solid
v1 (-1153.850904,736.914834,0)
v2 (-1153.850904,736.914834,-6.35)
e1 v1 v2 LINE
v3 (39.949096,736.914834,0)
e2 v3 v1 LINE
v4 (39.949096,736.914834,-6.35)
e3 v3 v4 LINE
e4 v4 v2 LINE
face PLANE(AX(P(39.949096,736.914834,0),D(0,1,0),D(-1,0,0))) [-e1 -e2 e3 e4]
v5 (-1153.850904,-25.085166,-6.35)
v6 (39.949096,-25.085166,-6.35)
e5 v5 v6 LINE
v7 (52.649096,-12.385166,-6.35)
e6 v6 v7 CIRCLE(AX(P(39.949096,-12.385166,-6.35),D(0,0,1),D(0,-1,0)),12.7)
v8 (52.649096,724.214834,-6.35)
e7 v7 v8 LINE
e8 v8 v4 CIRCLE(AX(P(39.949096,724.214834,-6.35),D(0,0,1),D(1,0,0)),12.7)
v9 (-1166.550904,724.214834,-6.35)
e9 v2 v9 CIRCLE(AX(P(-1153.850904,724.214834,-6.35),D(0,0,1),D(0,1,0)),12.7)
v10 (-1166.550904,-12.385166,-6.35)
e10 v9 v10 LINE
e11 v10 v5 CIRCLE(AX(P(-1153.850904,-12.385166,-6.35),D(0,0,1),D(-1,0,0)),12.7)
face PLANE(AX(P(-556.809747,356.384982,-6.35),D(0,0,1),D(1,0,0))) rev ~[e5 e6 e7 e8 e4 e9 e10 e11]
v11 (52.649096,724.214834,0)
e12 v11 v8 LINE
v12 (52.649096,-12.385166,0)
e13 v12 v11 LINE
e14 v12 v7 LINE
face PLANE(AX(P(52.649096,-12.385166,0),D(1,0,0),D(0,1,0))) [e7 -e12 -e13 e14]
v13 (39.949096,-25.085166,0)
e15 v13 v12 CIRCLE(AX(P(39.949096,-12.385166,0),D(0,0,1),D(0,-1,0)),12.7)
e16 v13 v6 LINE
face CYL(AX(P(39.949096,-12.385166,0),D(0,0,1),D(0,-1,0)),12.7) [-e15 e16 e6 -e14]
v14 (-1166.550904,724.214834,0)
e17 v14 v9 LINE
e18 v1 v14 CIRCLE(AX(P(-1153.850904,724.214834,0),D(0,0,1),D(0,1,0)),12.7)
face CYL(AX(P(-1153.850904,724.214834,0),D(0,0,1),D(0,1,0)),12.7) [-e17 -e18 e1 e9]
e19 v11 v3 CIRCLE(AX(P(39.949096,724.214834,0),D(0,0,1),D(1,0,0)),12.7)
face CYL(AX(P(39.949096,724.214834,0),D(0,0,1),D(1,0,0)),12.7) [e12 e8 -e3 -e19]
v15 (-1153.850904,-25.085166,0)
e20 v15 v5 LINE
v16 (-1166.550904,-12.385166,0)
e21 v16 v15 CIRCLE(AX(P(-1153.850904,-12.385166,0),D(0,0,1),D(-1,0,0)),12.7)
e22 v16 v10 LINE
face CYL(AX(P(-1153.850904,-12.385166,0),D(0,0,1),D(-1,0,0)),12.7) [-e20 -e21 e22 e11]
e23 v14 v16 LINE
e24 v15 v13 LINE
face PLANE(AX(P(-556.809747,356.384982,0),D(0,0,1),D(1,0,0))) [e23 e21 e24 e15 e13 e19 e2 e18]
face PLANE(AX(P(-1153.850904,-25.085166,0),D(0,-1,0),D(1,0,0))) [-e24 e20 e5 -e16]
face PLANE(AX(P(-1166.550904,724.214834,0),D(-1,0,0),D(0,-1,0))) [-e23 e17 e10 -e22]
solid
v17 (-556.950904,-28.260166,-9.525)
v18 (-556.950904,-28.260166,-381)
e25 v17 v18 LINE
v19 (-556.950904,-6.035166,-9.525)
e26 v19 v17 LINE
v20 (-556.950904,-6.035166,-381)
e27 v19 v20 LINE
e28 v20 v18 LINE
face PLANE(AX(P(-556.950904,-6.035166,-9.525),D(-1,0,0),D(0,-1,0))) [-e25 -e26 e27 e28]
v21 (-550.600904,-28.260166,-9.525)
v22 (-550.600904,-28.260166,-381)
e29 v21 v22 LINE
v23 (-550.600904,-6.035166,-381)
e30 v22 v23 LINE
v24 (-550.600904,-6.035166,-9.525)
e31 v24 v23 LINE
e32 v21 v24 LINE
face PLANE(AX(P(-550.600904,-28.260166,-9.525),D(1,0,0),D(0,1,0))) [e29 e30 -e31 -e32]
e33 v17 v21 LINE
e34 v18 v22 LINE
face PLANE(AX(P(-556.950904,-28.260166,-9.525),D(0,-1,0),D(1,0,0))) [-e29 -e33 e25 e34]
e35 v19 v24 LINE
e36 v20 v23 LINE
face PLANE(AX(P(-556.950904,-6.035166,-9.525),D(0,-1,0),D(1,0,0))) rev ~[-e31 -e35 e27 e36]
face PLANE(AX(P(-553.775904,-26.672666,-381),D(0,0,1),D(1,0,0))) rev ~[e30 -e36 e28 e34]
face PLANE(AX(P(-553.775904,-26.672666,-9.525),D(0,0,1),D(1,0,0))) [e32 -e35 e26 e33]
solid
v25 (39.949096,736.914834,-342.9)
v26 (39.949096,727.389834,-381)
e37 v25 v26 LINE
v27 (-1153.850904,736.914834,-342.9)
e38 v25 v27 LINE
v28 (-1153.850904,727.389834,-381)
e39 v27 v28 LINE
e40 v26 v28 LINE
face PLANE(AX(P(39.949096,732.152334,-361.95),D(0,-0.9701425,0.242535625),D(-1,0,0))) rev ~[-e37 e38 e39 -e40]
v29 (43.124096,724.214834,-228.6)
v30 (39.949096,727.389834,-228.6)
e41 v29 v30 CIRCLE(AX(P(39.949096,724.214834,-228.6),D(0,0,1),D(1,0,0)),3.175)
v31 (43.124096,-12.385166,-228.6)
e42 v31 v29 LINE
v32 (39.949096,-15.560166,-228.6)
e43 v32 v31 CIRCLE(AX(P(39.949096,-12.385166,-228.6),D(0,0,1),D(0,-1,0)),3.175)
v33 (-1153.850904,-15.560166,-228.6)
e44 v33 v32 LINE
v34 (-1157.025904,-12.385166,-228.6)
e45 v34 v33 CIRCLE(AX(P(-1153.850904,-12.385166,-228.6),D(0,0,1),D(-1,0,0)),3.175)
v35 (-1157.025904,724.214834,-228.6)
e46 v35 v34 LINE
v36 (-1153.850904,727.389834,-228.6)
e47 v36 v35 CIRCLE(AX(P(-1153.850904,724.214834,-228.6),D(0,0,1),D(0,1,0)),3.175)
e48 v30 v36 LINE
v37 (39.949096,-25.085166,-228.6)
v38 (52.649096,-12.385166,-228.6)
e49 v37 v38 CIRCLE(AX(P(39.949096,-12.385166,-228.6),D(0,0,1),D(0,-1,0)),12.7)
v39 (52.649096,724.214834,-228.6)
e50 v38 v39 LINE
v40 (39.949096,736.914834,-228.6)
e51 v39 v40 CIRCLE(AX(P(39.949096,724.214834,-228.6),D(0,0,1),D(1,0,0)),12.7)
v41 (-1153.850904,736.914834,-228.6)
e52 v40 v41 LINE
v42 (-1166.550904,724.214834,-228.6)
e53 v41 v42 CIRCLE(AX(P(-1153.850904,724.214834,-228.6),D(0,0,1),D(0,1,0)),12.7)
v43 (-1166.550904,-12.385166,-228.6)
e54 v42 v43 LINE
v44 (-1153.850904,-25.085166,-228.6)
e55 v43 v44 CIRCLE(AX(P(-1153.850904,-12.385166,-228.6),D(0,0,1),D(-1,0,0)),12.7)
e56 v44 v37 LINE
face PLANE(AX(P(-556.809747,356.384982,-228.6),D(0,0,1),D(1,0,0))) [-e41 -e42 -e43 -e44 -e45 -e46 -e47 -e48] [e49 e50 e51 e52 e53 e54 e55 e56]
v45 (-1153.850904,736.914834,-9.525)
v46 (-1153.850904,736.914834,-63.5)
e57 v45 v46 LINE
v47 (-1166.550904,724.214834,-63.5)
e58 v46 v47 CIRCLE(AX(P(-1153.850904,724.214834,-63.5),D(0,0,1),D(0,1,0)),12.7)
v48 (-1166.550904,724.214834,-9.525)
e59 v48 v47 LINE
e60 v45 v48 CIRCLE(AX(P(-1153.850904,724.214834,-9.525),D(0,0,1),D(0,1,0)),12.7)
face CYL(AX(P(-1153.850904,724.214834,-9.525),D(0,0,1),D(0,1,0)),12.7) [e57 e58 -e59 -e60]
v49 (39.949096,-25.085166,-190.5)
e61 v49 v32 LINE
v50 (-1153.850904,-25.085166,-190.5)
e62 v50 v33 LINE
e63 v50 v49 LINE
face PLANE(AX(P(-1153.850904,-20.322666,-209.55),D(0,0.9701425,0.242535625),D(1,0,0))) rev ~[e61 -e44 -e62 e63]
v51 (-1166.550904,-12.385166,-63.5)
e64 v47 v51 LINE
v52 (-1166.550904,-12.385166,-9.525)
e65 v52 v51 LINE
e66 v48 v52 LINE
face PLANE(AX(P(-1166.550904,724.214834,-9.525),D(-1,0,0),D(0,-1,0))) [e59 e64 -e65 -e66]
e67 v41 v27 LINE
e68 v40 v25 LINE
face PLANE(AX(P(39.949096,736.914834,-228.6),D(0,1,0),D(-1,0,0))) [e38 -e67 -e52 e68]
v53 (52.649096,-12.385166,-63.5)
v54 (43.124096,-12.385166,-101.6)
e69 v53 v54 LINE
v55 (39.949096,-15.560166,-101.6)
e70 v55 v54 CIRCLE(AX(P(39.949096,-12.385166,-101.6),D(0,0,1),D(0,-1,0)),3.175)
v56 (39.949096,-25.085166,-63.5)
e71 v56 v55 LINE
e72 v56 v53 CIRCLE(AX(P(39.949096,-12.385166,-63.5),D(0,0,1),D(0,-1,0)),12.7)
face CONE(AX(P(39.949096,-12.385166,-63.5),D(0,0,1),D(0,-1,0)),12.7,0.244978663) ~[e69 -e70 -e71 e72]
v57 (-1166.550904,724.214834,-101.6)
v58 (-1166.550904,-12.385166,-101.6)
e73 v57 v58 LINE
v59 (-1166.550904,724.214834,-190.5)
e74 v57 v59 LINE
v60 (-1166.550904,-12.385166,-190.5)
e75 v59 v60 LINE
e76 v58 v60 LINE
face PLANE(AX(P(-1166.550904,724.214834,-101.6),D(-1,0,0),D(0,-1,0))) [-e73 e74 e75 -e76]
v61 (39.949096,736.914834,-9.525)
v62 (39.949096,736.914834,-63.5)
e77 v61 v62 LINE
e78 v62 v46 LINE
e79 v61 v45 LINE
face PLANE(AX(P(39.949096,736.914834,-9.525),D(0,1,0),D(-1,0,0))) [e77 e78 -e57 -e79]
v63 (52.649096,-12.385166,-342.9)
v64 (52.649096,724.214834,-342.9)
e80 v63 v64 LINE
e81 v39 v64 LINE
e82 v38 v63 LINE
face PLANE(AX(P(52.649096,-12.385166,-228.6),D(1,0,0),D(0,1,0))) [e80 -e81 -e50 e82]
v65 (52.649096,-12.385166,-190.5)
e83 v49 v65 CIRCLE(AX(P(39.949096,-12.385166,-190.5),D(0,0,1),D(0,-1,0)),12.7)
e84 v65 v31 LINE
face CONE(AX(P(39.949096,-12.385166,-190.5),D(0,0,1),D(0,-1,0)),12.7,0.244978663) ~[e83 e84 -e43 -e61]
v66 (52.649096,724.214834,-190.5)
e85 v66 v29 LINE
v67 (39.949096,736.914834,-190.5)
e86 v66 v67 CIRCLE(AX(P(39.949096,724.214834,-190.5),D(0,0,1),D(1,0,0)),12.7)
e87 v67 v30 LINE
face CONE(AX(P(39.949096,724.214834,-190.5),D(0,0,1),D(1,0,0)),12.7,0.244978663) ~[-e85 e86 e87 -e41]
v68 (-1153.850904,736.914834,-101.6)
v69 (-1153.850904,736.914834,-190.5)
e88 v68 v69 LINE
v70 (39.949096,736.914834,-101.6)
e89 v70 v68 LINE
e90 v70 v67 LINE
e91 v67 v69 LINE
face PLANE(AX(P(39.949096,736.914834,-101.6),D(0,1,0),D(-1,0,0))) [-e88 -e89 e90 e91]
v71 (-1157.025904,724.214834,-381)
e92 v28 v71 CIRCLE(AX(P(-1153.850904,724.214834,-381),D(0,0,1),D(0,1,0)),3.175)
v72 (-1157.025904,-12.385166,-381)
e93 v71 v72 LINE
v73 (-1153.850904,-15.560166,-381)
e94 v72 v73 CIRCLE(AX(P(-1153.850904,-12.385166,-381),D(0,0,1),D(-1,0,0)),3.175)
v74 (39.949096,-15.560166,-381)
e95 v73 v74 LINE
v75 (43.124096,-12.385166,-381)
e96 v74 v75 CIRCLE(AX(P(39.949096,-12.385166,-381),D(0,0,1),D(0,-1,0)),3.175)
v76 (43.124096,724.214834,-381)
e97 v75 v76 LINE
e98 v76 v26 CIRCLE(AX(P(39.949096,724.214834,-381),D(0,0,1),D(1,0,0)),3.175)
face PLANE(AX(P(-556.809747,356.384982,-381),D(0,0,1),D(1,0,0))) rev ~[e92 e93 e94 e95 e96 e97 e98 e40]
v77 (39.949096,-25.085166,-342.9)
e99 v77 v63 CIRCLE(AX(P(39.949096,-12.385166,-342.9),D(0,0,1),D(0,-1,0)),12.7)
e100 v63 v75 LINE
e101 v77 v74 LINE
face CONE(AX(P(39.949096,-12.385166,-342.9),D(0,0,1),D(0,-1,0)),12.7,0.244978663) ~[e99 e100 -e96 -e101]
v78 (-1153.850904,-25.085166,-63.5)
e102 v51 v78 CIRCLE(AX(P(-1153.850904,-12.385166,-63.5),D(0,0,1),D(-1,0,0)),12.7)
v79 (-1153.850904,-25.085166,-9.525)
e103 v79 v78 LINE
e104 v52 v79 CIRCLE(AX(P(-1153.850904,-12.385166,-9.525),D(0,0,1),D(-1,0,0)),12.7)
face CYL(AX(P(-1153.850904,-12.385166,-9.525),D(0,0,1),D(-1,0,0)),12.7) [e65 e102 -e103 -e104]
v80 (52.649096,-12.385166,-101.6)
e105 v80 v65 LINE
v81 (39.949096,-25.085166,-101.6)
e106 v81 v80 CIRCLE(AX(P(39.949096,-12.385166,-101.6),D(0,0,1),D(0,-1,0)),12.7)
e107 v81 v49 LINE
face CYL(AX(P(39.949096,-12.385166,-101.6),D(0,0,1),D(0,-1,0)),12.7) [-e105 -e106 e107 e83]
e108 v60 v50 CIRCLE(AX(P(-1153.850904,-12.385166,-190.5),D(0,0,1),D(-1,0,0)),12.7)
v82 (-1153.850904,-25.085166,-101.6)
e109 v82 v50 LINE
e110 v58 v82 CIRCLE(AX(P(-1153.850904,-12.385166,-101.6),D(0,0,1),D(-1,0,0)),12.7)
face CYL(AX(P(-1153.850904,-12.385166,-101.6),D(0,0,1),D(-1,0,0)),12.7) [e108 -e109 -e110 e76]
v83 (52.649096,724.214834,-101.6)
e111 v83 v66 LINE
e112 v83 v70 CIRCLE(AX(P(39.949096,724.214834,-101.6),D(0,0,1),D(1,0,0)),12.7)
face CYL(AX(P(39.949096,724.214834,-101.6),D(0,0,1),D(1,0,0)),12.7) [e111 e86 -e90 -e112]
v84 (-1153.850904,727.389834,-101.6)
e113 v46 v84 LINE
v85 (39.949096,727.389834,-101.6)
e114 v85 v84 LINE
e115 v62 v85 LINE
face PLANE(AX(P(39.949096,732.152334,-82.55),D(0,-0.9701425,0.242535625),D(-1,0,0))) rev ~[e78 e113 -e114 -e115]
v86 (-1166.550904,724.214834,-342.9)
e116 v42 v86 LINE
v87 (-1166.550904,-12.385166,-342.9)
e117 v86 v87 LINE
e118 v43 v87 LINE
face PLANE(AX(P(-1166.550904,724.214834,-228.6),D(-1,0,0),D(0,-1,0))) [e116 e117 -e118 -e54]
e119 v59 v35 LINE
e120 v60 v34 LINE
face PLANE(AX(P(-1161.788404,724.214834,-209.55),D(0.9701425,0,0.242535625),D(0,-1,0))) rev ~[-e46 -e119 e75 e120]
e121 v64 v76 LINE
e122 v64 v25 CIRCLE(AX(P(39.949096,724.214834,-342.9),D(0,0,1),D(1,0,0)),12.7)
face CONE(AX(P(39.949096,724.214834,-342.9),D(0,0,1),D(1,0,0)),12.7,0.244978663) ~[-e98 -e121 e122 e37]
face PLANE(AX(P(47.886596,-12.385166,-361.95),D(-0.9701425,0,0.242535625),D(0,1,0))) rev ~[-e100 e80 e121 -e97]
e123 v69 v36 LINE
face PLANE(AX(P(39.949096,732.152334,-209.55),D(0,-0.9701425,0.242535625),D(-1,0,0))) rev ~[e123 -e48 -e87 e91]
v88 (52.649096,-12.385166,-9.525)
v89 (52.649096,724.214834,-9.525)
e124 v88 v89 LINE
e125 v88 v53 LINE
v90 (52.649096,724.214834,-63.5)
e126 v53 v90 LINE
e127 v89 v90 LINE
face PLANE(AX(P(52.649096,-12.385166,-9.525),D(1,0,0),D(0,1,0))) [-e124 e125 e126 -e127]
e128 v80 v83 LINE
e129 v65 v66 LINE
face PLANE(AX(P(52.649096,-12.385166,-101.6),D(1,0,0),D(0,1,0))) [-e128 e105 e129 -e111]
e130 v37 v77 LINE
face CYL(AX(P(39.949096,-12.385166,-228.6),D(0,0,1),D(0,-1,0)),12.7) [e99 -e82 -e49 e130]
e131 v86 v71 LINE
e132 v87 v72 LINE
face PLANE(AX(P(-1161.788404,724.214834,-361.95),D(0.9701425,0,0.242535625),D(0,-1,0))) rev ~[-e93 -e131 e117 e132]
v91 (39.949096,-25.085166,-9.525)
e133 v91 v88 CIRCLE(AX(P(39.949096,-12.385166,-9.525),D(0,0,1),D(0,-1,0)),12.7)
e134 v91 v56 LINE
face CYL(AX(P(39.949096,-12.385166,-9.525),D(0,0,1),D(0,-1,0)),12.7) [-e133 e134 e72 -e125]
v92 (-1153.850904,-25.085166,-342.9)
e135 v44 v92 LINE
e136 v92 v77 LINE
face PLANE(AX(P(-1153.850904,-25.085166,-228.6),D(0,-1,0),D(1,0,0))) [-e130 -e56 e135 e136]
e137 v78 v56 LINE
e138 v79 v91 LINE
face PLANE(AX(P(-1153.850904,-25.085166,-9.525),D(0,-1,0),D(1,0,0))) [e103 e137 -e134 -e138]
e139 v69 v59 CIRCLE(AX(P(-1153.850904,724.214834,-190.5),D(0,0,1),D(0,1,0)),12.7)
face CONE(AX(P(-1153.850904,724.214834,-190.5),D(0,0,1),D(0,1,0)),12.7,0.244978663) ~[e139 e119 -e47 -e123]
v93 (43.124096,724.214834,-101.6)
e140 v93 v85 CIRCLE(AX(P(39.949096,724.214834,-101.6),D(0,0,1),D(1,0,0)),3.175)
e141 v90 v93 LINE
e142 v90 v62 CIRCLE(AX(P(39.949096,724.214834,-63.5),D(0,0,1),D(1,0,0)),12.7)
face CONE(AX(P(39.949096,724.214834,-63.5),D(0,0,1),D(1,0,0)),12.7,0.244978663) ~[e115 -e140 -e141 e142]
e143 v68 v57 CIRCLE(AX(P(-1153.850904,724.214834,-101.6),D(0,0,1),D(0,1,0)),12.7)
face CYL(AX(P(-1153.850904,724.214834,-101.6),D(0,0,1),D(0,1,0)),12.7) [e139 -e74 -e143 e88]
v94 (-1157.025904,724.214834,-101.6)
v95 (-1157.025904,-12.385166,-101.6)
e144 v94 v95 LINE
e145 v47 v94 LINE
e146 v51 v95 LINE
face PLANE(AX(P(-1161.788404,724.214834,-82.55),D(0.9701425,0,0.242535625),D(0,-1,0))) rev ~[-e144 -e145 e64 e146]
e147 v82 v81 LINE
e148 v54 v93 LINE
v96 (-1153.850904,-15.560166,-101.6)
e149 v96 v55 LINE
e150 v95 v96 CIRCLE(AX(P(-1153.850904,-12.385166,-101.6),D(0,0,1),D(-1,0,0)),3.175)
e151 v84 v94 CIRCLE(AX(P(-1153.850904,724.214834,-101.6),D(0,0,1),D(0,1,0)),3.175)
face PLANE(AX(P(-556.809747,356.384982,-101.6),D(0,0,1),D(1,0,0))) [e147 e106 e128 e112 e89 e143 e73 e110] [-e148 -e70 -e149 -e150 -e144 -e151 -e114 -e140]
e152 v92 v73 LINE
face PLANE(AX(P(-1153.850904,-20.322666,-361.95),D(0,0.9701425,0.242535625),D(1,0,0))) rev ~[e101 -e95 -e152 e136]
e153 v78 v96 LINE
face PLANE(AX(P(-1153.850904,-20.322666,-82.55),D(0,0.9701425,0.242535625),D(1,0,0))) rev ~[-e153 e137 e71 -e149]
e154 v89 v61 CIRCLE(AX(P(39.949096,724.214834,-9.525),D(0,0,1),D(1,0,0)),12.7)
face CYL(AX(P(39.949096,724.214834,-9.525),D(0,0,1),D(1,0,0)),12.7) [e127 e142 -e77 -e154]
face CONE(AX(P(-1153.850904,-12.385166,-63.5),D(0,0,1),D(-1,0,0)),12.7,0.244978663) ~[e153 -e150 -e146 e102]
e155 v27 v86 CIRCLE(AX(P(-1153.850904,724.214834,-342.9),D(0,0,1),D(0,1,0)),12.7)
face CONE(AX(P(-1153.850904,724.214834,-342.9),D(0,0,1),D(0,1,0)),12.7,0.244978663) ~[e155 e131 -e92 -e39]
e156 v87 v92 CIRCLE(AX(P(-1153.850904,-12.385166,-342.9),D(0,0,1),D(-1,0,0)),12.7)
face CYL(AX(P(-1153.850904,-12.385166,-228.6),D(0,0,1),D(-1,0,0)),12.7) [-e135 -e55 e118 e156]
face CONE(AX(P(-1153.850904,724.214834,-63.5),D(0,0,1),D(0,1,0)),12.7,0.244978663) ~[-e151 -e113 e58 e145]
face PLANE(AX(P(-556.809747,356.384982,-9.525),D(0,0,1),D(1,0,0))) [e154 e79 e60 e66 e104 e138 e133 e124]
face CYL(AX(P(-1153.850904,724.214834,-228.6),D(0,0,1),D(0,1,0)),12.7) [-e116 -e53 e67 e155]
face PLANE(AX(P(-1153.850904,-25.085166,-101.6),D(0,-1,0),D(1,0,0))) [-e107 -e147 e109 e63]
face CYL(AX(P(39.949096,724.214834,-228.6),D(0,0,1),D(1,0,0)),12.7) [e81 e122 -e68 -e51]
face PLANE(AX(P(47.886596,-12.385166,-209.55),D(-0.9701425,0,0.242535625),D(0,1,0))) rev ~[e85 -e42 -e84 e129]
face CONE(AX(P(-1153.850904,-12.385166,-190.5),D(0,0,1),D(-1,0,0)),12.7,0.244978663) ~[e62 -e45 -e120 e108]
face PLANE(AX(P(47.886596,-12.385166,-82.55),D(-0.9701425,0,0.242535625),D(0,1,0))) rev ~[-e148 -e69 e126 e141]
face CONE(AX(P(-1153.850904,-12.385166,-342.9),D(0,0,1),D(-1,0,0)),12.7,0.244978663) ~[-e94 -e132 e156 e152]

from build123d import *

# Parameters (mm, degrees)
F1_DEPTH = 6.35
F2_START = -9.525
F2_DEPTH = 92.075
F3_SIZE2 = 9.525
F3_SIZE  = 38.1
F4_START = -101.6
F4_DEPTH = 127
F5_SIZE2 = 9.525
F5_SIZE  = 38.1
F6_START = -228.6
F6_DEPTH = 152.4
F7_SIZE2 = 9.525
F7_SIZE  = 38.1
F9_START = -9.525
F8_W     = 6.35
F8_H     = 3.175
F8_H_2   = 19.05
F9_DEPTH = 371.475


# Not quite as in the source:
# - a feature names something its author has since deleted; it is built from what else it names


with BuildPart() as f1:
    # F0 (on Top) → F1 (new body)
    with BuildSketch(Plane.XY):
        with BuildLine():
            Line((39.9490956545, 736.9148339033), (-1153.8509043455, 736.9148339033))
            ThreePointArc((-1153.8509043455, 736.9148339033), (-1162.8311604666, 733.1950900244), (-1166.5509043455, 724.2148339033))
            Line((-1166.5509043455, 724.2148339033), (-1166.5509043455, 40.0023339033))
            Line((-1166.5509043455, 40.0023339033), (-1166.5509043455, 38.4148339033))
            Line((-1166.5509043455, 38.4148339033), (-1147.5009043455, 38.4148339033))
            Line((-1147.5009043455, 38.4148339033), (-1103.0509043455, 38.4148339033))
            Line((-1103.0509043455, 38.4148339033), (-1103.0509043455, -6.0351660967))
            Line((-1103.0509043455, -6.0351660967), (-1103.0509043455, -25.0851660967))
            Line((-1103.0509043455, -25.0851660967), (-1101.4634043455, -25.0851660967))
            Line((-1101.4634043455, -25.0851660967), (-560.1259043455, -25.0851660967))
            Line((-560.1259043455, -25.0851660967), (-553.7759043455, -25.0851660967))
            Line((-553.7759043455, -25.0851660967), (39.9490956545, -25.0851660967))
            ThreePointArc((39.9490956545, -25.0851660967), (48.9293517756, -21.3654222178), (52.6490956545, -12.3851660967))
            Line((52.6490956545, -12.3851660967), (52.6490956545, 724.2148339033))
            ThreePointArc((52.6490956545, 724.2148339033), (48.9293517756, 733.1950900244), (39.9490956545, 736.9148339033))
        make_face()
        with BuildLine():
            Line((-1147.5009043455, 38.4148339033), (-1166.5509043455, 38.4148339033))
            Line((-1166.5509043455, 38.4148339033), (-1166.5509043455, -12.3851660967))
            ThreePointArc((-1166.5509043455, -12.3851660967), (-1162.8311604666, -21.3654222178), (-1153.8509043455, -25.0851660967))
            Line((-1153.8509043455, -25.0851660967), (-1103.0509043455, -25.0851660967))
            Line((-1103.0509043455, -25.0851660967), (-1103.0509043455, -6.0351660967))
            Line((-1103.0509043455, -6.0351660967), (-1103.0509043455, 38.4148339033))
            Line((-1103.0509043455, 38.4148339033), (-1147.5009043455, 38.4148339033))
        make_face()
    extrude(amount=-F1_DEPTH)


with BuildPart() as f2:
    # F0 (on Top) → F2 (new body)
    with BuildSketch(Plane.XY.offset(F2_START)):
        with BuildLine():
            Line((39.9490956545, 736.9148339033), (-1153.8509043455, 736.9148339033))
            ThreePointArc((-1153.8509043455, 736.9148339033), (-1162.8311604666, 733.1950900244), (-1166.5509043455, 724.2148339033))
            Line((-1166.5509043455, 724.2148339033), (-1166.5509043455, 40.0023339033))
            Line((-1166.5509043455, 40.0023339033), (-1166.5509043455, 38.4148339033))
            Line((-1166.5509043455, 38.4148339033), (-1147.5009043455, 38.4148339033))
            Line((-1147.5009043455, 38.4148339033), (-1103.0509043455, 38.4148339033))
            Line((-1103.0509043455, 38.4148339033), (-1103.0509043455, -6.0351660967))
            Line((-1103.0509043455, -6.0351660967), (-1103.0509043455, -25.0851660967))
            Line((-1103.0509043455, -25.0851660967), (-1101.4634043455, -25.0851660967))
            Line((-1101.4634043455, -25.0851660967), (-560.1259043455, -25.0851660967))
            Line((-560.1259043455, -25.0851660967), (-553.7759043455, -25.0851660967))
            Line((-553.7759043455, -25.0851660967), (39.9490956545, -25.0851660967))
            ThreePointArc((39.9490956545, -25.0851660967), (48.9293517756, -21.3654222178), (52.6490956545, -12.3851660967))
            Line((52.6490956545, -12.3851660967), (52.6490956545, 724.2148339033))
            ThreePointArc((52.6490956545, 724.2148339033), (48.9293517756, 733.1950900244), (39.9490956545, 736.9148339033))
        make_face()
        with BuildLine():
            Line((-1147.5009043455, 38.4148339033), (-1166.5509043455, 38.4148339033))
            Line((-1166.5509043455, 38.4148339033), (-1166.5509043455, -12.3851660967))
            ThreePointArc((-1166.5509043455, -12.3851660967), (-1162.8311604666, -21.3654222178), (-1153.8509043455, -25.0851660967))
            Line((-1153.8509043455, -25.0851660967), (-1103.0509043455, -25.0851660967))
            Line((-1103.0509043455, -25.0851660967), (-1103.0509043455, -6.0351660967))
            Line((-1103.0509043455, -6.0351660967), (-1103.0509043455, 38.4148339033))
            Line((-1103.0509043455, 38.4148339033), (-1147.5009043455, 38.4148339033))
        make_face()
    extrude(amount=-F2_DEPTH)

    # F3
    f3_edges = [f2.edges().sort_by_distance(p)[0] for p in [
        (-556.950904, 736.914834, -101.6),
        (-1162.83116, 733.19509, -101.6),
        (-1166.550904, 355.914834, -101.6),
        (-1162.83116, -21.365422, -101.6),
        (-556.950904, -25.085166, -101.6),
        (48.929352, -21.365422, -101.6),
        (52.649096, 355.914834, -101.6),
        (48.929352, 733.19509, -101.6),
    ]]
    chamfer(f3_edges, length=F3_SIZE, length2=F3_SIZE2)

    # F0 (on Top) → F4 (join)
    with BuildSketch(Plane.XY.offset(F4_START)):
        with BuildLine():
            Line((39.9490956545, 736.9148339033), (-1153.8509043455, 736.9148339033))
            ThreePointArc((-1153.8509043455, 736.9148339033), (-1162.8311604666, 733.1950900244), (-1166.5509043455, 724.2148339033))
            Line((-1166.5509043455, 724.2148339033), (-1166.5509043455, 40.0023339033))
            Line((-1166.5509043455, 40.0023339033), (-1166.5509043455, 38.4148339033))
            Line((-1166.5509043455, 38.4148339033), (-1147.5009043455, 38.4148339033))
            Line((-1147.5009043455, 38.4148339033), (-1103.0509043455, 38.4148339033))
            Line((-1103.0509043455, 38.4148339033), (-1103.0509043455, -6.0351660967))
            Line((-1103.0509043455, -6.0351660967), (-1103.0509043455, -25.0851660967))
            Line((-1103.0509043455, -25.0851660967), (-1101.4634043455, -25.0851660967))
            Line((-1101.4634043455, -25.0851660967), (-560.1259043455, -25.0851660967))
            Line((-560.1259043455, -25.0851660967), (-553.7759043455, -25.0851660967))
            Line((-553.7759043455, -25.0851660967), (39.9490956545, -25.0851660967))
            ThreePointArc((39.9490956545, -25.0851660967), (48.9293517756, -21.3654222178), (52.6490956545, -12.3851660967))
            Line((52.6490956545, -12.3851660967), (52.6490956545, 724.2148339033))
            ThreePointArc((52.6490956545, 724.2148339033), (48.9293517756, 733.1950900244), (39.9490956545, 736.9148339033))
        make_face()
        with BuildLine():
            Line((-1147.5009043455, 38.4148339033), (-1166.5509043455, 38.4148339033))
            Line((-1166.5509043455, 38.4148339033), (-1166.5509043455, -12.3851660967))
            ThreePointArc((-1166.5509043455, -12.3851660967), (-1162.8311604666, -21.3654222178), (-1153.8509043455, -25.0851660967))
            Line((-1153.8509043455, -25.0851660967), (-1103.0509043455, -25.0851660967))
            Line((-1103.0509043455, -25.0851660967), (-1103.0509043455, -6.0351660967))
            Line((-1103.0509043455, -6.0351660967), (-1103.0509043455, 38.4148339033))
            Line((-1103.0509043455, 38.4148339033), (-1147.5009043455, 38.4148339033))
        make_face()
    extrude(amount=-F4_DEPTH)

    # F5
    f5_edges = [f2.edges().sort_by_distance(p)[0] for p in [
        (-556.950904, 736.914834, -228.6),
        (-1162.83116, 733.19509, -228.6),
        (-1166.550904, 355.914834, -228.6),
        (-1162.83116, -21.365422, -228.6),
        (-556.950904, -25.085166, -228.6),
        (48.929352, -21.365422, -228.6),
        (52.649096, 355.914834, -228.6),
        (48.929352, 733.19509, -228.6),
    ]]
    chamfer(f5_edges, length=F5_SIZE, length2=F5_SIZE2)

    # F0 (on Top) → F6 (join)
    with BuildSketch(Plane.XY.offset(F6_START)):
        with BuildLine():
            Line((39.9490956545, 736.9148339033), (-1153.8509043455, 736.9148339033))
            ThreePointArc((-1153.8509043455, 736.9148339033), (-1162.8311604666, 733.1950900244), (-1166.5509043455, 724.2148339033))
            Line((-1166.5509043455, 724.2148339033), (-1166.5509043455, 40.0023339033))
            Line((-1166.5509043455, 40.0023339033), (-1166.5509043455, 38.4148339033))
            Line((-1166.5509043455, 38.4148339033), (-1147.5009043455, 38.4148339033))
            Line((-1147.5009043455, 38.4148339033), (-1103.0509043455, 38.4148339033))
            Line((-1103.0509043455, 38.4148339033), (-1103.0509043455, -6.0351660967))
            Line((-1103.0509043455, -6.0351660967), (-1103.0509043455, -25.0851660967))
            Line((-1103.0509043455, -25.0851660967), (-1101.4634043455, -25.0851660967))
            Line((-1101.4634043455, -25.0851660967), (-560.1259043455, -25.0851660967))
            Line((-560.1259043455, -25.0851660967), (-553.7759043455, -25.0851660967))
            Line((-553.7759043455, -25.0851660967), (39.9490956545, -25.0851660967))
            ThreePointArc((39.9490956545, -25.0851660967), (48.9293517756, -21.3654222178), (52.6490956545, -12.3851660967))
            Line((52.6490956545, -12.3851660967), (52.6490956545, 724.2148339033))
            ThreePointArc((52.6490956545, 724.2148339033), (48.9293517756, 733.1950900244), (39.9490956545, 736.9148339033))
        make_face()
        with BuildLine():
            Line((-1147.5009043455, 38.4148339033), (-1166.5509043455, 38.4148339033))
            Line((-1166.5509043455, 38.4148339033), (-1166.5509043455, -12.3851660967))
            ThreePointArc((-1166.5509043455, -12.3851660967), (-1162.8311604666, -21.3654222178), (-1153.8509043455, -25.0851660967))
            Line((-1153.8509043455, -25.0851660967), (-1103.0509043455, -25.0851660967))
            Line((-1103.0509043455, -25.0851660967), (-1103.0509043455, -6.0351660967))
            Line((-1103.0509043455, -6.0351660967), (-1103.0509043455, 38.4148339033))
            Line((-1103.0509043455, 38.4148339033), (-1147.5009043455, 38.4148339033))
        make_face()
    extrude(amount=-F6_DEPTH)

    # F7
    f7_edges = [f2.edges().sort_by_distance(p)[0] for p in [
        (-556.950904, 736.914834, -381),
        (-1162.83116, 733.19509, -381),
        (-1166.550904, 355.914834, -381),
        (-1162.83116, -21.365422, -381),
        (-556.950904, -25.085166, -381),
        (48.929352, -21.365422, -381),
        (52.649096, 355.914834, -381),
        (48.929352, 733.19509, -381),
    ]]
    chamfer(f7_edges, length=F7_SIZE, length2=F7_SIZE2)


with BuildPart() as f9:
    # F8 (on face) → F9 (new body)
    with BuildSketch(Plane.XY.offset(F9_START)):
        with Locations((-553.7759043455, -26.6726660967)):
            Rectangle(F8_W, F8_H)
        with Locations((-553.7759043455, -15.5601660967)):
            Rectangle(F8_W, F8_H_2)
    extrude(amount=-F9_DEPTH)


solid = Compound([f1.part, f2.part, f9.part])
